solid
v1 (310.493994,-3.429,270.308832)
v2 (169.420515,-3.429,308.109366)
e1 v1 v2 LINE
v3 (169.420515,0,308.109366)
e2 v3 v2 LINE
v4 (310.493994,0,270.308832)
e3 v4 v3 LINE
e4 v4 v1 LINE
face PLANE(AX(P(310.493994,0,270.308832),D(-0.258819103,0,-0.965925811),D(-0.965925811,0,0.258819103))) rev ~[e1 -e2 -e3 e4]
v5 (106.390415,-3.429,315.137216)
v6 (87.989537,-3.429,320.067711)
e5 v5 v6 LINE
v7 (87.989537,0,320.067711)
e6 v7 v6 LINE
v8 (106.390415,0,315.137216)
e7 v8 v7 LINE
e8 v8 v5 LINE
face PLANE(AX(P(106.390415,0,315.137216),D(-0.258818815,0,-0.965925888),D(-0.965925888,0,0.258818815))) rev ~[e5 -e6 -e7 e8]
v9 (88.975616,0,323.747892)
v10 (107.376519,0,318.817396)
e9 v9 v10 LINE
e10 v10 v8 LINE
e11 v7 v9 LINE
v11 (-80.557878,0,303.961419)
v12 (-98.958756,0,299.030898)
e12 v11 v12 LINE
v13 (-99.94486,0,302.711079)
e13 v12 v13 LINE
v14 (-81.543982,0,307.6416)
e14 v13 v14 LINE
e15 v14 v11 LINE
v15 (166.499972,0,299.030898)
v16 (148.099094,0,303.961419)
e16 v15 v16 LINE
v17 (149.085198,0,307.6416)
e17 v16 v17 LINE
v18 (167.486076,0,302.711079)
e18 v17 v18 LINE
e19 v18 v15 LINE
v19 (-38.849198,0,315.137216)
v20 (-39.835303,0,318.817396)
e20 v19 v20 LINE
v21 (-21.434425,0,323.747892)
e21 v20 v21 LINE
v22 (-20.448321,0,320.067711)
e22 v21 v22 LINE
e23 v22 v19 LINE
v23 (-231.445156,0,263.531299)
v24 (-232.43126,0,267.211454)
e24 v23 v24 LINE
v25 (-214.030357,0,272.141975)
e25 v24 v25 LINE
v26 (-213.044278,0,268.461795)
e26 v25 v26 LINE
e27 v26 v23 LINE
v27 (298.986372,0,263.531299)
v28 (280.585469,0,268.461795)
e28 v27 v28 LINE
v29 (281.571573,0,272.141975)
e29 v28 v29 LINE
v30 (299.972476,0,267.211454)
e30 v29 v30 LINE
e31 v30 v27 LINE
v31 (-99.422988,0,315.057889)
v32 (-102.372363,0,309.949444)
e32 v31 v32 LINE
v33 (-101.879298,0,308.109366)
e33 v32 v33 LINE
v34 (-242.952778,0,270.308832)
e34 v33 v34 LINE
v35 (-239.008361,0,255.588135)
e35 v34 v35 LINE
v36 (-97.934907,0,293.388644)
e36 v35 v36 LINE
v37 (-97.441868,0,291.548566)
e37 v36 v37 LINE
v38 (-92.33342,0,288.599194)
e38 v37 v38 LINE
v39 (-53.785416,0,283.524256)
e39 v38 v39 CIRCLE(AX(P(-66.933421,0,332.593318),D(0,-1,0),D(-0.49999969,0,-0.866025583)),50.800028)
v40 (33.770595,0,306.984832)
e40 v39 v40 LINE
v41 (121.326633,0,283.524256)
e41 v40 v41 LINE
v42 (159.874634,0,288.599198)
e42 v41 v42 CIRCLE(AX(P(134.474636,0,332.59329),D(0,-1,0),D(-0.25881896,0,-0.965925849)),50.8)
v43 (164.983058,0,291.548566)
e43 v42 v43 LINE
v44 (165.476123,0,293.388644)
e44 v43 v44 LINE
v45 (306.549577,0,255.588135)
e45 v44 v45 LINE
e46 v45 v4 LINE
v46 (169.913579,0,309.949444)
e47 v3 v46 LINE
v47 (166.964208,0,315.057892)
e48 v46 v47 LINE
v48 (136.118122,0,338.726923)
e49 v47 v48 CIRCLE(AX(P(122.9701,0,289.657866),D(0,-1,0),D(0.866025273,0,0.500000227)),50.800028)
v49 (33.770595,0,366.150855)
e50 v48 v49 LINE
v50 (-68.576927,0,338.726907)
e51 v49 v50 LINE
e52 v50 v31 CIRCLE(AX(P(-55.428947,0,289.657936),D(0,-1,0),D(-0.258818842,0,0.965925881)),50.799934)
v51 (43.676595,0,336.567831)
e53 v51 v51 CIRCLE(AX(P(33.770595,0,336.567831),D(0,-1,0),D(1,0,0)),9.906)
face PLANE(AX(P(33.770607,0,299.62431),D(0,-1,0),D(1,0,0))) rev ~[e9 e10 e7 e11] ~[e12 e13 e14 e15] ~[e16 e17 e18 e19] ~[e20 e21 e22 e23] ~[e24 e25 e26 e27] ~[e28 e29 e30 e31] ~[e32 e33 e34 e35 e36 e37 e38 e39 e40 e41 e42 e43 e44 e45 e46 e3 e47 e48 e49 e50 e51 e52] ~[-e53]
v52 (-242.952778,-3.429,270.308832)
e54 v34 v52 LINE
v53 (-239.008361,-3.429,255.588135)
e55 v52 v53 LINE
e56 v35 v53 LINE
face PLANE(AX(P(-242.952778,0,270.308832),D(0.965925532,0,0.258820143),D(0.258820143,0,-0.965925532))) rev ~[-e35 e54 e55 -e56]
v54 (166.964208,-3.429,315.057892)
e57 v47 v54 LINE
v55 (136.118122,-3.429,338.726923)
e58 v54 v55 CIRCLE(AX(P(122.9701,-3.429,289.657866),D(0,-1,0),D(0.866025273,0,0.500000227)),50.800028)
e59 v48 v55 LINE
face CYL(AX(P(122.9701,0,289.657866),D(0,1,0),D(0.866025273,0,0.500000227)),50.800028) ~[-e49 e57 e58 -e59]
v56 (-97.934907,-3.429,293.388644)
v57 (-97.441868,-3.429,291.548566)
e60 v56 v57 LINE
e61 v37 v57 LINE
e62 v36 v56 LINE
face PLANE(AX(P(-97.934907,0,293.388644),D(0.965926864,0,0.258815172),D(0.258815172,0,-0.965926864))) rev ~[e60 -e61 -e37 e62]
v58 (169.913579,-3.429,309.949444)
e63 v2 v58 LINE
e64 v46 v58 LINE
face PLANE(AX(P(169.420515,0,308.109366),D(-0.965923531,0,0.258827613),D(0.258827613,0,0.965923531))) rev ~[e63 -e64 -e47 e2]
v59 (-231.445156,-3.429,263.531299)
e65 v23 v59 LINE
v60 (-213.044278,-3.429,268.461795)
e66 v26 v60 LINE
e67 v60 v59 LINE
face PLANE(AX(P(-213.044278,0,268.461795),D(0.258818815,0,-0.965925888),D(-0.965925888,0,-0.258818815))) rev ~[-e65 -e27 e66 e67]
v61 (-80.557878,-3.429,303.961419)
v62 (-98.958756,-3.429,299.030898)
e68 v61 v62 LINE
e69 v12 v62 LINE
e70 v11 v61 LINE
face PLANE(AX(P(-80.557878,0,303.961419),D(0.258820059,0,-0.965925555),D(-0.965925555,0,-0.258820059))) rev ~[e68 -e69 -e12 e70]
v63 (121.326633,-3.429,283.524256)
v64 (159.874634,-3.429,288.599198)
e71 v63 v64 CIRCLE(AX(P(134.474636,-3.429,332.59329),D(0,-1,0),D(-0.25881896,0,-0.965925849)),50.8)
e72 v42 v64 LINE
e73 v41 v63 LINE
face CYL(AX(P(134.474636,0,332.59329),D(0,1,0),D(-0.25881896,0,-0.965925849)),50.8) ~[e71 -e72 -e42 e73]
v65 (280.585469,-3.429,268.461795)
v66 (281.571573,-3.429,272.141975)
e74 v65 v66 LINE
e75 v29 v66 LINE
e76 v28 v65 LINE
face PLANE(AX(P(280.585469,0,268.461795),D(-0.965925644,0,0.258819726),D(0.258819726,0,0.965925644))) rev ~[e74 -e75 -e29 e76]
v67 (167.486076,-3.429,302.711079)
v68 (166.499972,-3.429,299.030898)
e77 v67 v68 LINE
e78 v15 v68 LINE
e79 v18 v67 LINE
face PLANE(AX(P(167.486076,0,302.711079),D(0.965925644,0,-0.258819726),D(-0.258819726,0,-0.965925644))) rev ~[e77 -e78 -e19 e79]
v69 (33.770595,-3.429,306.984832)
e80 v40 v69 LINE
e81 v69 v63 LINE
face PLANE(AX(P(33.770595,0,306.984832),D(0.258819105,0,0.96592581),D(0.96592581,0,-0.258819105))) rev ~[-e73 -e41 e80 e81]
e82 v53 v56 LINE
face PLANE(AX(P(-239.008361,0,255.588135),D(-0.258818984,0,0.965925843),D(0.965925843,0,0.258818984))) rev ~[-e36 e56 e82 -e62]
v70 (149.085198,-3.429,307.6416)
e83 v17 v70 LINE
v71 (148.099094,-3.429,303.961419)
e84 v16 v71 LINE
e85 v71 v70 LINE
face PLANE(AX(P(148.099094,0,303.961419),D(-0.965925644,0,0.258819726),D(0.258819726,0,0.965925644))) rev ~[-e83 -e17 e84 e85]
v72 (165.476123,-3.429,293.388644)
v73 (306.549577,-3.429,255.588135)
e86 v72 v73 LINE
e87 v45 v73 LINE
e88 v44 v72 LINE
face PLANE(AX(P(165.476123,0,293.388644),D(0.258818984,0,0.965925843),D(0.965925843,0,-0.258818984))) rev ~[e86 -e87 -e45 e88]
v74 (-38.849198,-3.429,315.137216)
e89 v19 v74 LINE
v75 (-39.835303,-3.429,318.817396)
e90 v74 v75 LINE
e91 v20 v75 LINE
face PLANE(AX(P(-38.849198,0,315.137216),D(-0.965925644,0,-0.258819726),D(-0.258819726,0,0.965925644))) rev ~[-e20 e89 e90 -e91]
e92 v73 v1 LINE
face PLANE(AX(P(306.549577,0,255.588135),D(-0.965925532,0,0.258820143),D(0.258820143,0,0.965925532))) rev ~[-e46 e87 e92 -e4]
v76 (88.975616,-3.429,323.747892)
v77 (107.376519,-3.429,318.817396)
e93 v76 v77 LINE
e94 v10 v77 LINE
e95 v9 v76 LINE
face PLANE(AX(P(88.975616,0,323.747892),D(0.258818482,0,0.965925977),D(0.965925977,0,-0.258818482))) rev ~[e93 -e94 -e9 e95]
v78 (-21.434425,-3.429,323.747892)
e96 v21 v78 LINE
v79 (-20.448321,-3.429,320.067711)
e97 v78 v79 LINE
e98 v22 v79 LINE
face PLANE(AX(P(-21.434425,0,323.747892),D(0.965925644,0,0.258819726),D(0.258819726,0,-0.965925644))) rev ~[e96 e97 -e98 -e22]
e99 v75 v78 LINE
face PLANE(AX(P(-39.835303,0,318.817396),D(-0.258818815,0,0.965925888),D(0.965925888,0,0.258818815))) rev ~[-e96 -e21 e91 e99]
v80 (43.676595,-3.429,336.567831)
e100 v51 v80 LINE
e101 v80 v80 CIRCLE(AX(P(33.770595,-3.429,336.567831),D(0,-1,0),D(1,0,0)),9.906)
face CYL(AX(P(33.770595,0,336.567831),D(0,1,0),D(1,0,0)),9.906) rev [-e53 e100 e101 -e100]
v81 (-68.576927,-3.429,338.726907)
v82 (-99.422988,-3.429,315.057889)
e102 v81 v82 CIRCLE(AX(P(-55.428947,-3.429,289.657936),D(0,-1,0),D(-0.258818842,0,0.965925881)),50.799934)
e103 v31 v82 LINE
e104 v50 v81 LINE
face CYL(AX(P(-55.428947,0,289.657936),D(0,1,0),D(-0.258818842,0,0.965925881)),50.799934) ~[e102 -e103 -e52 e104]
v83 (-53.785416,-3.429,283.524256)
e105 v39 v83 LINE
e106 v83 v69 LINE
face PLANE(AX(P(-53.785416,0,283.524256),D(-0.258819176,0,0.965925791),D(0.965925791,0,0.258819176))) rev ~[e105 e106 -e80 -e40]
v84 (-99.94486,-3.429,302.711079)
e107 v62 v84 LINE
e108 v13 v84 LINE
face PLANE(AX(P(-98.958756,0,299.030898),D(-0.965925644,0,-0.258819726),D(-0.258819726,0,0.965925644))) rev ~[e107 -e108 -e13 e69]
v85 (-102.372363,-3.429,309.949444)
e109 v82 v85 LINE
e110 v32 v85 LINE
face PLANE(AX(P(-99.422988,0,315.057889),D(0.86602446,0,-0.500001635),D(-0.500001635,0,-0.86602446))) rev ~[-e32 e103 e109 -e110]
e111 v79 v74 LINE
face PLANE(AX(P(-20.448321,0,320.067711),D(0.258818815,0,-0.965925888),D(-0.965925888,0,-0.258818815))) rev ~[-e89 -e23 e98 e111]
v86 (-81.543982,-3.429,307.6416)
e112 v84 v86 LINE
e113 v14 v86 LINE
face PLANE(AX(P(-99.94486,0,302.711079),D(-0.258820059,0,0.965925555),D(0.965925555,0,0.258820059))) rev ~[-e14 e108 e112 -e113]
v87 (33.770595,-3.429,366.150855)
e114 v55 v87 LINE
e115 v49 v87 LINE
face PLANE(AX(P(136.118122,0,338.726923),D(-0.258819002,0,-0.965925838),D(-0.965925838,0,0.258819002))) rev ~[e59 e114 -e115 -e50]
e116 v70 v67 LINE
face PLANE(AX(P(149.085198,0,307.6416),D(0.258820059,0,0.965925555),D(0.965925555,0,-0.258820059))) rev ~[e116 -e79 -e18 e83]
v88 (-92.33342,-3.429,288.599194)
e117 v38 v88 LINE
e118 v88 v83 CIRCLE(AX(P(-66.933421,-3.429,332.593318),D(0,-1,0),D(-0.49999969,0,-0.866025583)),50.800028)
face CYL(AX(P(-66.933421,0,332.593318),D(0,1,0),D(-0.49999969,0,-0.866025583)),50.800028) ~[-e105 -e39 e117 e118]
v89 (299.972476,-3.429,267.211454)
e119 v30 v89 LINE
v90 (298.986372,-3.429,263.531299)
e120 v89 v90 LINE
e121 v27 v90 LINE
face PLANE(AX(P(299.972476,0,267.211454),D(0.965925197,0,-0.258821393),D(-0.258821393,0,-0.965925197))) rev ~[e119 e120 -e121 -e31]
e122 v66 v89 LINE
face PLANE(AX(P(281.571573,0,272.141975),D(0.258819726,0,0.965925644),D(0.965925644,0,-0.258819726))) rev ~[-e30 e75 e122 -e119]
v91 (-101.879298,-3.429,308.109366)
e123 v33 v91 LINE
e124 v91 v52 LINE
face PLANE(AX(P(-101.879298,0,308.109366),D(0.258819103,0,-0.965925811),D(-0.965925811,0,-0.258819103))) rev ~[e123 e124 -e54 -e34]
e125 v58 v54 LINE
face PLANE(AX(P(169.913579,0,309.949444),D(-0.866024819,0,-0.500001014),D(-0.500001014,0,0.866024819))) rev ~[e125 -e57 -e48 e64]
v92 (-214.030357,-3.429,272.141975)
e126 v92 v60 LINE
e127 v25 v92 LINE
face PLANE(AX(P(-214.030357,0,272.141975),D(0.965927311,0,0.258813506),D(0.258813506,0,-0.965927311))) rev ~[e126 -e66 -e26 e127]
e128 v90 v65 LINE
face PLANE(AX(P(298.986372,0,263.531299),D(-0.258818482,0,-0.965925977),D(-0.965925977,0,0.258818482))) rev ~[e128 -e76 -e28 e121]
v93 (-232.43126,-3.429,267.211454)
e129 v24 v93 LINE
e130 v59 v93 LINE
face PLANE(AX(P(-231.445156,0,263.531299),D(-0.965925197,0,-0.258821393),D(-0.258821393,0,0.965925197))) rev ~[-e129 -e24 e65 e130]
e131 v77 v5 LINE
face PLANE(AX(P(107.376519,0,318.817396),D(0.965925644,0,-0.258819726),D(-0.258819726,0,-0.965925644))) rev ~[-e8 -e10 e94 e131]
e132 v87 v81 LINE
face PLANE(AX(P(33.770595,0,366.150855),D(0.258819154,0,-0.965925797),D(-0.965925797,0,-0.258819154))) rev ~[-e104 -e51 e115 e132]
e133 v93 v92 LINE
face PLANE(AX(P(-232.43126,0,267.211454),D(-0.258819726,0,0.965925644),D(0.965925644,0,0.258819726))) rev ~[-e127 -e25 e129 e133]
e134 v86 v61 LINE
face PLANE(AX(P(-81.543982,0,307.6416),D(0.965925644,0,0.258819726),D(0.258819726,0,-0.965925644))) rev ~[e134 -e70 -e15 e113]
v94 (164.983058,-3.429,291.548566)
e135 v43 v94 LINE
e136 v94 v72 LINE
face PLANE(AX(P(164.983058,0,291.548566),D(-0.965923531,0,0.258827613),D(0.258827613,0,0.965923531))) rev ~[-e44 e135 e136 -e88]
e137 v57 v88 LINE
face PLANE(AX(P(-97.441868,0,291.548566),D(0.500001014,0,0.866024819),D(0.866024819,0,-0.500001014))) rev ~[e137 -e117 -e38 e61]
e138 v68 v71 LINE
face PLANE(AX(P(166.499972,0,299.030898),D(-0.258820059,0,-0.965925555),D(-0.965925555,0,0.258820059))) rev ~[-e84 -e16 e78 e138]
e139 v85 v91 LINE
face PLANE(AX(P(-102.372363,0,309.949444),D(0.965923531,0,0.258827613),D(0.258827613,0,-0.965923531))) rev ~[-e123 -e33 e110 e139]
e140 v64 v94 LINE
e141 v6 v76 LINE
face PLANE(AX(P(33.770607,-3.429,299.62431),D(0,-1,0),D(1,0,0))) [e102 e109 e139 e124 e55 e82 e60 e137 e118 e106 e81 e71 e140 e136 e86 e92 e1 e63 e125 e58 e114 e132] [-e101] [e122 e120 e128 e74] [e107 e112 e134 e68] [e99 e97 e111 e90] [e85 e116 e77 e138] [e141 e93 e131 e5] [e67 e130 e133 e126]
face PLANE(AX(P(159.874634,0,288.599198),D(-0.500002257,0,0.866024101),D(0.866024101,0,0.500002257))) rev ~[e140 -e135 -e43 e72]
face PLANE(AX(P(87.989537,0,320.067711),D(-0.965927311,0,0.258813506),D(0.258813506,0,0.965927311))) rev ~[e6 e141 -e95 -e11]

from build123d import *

# Parameters (mm, degrees)
F0_R     = 9.906
F1_DEPTH = 3.429


# Not quite as in the source:
# - ends of sketch curves that miss each other by under 0.0002 mm in the source are joined


with BuildPart() as f1:
    # F0 (on Front) → F1 (new body)
    with BuildSketch(Plane.XZ):
        with BuildLine():
            ThreePointArc((121.3266326526, 283.5242564606), (141.1053673826, 282.2278907762), (159.8746336835, 288.5991978658))
            Line((159.8746336835, 288.5991978658), (164.9830584, 291.548566))
            Line((164.9830584, 291.548566), (165.4761232, 293.3886436))
            Line((165.4761232, 293.3886436), (306.5495774, 255.588135))
            Line((306.5495774, 255.588135), (310.4939942, 270.308832))
            Line((310.4939942, 270.308832), (169.4205146, 308.109366))
            Line((169.4205146, 308.109366), (169.9135794, 309.9494436))
            Line((169.9135794, 309.9494436), (166.9642076, 315.0578916))
            ThreePointArc((166.9642076, 315.0578916), (153.8951945869, 329.9602399108), (136.1181216974, 338.7269230379))
            Line((136.1181216974, 338.7269230379), (33.7705954, 366.1508552))
            Line((33.7705954, 366.1508552), (-68.5769266, 338.726907))
            ThreePointArc((-68.5769266, 338.726907), (-86.3539881192, 329.9602324429), (-99.4229877342, 315.0578894835))
            Line((-99.4229877342, 315.0578894835), (-102.3723632, 309.9494436))
            Line((-102.3723632, 309.9494436), (-101.8792984, 308.109366))
            Line((-101.8792984, 308.109366), (-242.952778, 270.308832))
            Line((-242.952778, 270.308832), (-239.0083612, 255.588135))
            Line((-239.0083612, 255.588135), (-97.934907, 293.3886436))
            Line((-97.934907, 293.3886436), (-97.4418676, 291.548566))
            Line((-97.4418676, 291.548566), (-92.3334196, 288.5991942))
            ThreePointArc((-92.3334196, 288.5991942), (-73.5641511826, 282.2278907762), (-53.7854164526, 283.5242564606))
            Line((-53.7854164526, 283.5242564606), (33.7705954, 306.9848318))
            Line((33.7705954, 306.9848318), (121.3266326526, 283.5242564606))
        make_face()
        Polygon((-232.4312598, 267.2114544), (-214.0303568, 272.1419754), (-213.044278, 268.4617948), (-231.4451556, 263.5312992), align=None, mode=Mode.SUBTRACT)
        Polygon((-99.9448598, 302.7110786), (-81.5439822, 307.6415996), (-80.557878, 303.961419), (-98.9587556, 299.030898), align=None, mode=Mode.SUBTRACT)
        Polygon((280.5854688, 268.4617948), (281.571573, 272.1419754), (299.972476, 267.2114544), (298.9863718, 263.5312992), align=None, mode=Mode.SUBTRACT)
        Polygon((167.486076, 302.7110786), (166.4999718, 299.030898), (148.0990942, 303.961419), (149.0851984, 307.6415996), align=None, mode=Mode.SUBTRACT)
        Polygon((-39.8353026, 318.8173964), (-21.434425, 323.747892), (-20.4483208, 320.0677114), (-38.8491984, 315.1372158), align=None, mode=Mode.SUBTRACT)
        with Locations((33.7705954, 336.5678308)):
            Circle(F0_R, mode=Mode.SUBTRACT)
        Polygon((87.989537, 320.0677114), (88.9756158, 323.747892), (107.3765188, 318.8173964), (106.3904146, 315.1372158), align=None, mode=Mode.SUBTRACT)
    extrude(amount=F1_DEPTH)


solid = f1.part
